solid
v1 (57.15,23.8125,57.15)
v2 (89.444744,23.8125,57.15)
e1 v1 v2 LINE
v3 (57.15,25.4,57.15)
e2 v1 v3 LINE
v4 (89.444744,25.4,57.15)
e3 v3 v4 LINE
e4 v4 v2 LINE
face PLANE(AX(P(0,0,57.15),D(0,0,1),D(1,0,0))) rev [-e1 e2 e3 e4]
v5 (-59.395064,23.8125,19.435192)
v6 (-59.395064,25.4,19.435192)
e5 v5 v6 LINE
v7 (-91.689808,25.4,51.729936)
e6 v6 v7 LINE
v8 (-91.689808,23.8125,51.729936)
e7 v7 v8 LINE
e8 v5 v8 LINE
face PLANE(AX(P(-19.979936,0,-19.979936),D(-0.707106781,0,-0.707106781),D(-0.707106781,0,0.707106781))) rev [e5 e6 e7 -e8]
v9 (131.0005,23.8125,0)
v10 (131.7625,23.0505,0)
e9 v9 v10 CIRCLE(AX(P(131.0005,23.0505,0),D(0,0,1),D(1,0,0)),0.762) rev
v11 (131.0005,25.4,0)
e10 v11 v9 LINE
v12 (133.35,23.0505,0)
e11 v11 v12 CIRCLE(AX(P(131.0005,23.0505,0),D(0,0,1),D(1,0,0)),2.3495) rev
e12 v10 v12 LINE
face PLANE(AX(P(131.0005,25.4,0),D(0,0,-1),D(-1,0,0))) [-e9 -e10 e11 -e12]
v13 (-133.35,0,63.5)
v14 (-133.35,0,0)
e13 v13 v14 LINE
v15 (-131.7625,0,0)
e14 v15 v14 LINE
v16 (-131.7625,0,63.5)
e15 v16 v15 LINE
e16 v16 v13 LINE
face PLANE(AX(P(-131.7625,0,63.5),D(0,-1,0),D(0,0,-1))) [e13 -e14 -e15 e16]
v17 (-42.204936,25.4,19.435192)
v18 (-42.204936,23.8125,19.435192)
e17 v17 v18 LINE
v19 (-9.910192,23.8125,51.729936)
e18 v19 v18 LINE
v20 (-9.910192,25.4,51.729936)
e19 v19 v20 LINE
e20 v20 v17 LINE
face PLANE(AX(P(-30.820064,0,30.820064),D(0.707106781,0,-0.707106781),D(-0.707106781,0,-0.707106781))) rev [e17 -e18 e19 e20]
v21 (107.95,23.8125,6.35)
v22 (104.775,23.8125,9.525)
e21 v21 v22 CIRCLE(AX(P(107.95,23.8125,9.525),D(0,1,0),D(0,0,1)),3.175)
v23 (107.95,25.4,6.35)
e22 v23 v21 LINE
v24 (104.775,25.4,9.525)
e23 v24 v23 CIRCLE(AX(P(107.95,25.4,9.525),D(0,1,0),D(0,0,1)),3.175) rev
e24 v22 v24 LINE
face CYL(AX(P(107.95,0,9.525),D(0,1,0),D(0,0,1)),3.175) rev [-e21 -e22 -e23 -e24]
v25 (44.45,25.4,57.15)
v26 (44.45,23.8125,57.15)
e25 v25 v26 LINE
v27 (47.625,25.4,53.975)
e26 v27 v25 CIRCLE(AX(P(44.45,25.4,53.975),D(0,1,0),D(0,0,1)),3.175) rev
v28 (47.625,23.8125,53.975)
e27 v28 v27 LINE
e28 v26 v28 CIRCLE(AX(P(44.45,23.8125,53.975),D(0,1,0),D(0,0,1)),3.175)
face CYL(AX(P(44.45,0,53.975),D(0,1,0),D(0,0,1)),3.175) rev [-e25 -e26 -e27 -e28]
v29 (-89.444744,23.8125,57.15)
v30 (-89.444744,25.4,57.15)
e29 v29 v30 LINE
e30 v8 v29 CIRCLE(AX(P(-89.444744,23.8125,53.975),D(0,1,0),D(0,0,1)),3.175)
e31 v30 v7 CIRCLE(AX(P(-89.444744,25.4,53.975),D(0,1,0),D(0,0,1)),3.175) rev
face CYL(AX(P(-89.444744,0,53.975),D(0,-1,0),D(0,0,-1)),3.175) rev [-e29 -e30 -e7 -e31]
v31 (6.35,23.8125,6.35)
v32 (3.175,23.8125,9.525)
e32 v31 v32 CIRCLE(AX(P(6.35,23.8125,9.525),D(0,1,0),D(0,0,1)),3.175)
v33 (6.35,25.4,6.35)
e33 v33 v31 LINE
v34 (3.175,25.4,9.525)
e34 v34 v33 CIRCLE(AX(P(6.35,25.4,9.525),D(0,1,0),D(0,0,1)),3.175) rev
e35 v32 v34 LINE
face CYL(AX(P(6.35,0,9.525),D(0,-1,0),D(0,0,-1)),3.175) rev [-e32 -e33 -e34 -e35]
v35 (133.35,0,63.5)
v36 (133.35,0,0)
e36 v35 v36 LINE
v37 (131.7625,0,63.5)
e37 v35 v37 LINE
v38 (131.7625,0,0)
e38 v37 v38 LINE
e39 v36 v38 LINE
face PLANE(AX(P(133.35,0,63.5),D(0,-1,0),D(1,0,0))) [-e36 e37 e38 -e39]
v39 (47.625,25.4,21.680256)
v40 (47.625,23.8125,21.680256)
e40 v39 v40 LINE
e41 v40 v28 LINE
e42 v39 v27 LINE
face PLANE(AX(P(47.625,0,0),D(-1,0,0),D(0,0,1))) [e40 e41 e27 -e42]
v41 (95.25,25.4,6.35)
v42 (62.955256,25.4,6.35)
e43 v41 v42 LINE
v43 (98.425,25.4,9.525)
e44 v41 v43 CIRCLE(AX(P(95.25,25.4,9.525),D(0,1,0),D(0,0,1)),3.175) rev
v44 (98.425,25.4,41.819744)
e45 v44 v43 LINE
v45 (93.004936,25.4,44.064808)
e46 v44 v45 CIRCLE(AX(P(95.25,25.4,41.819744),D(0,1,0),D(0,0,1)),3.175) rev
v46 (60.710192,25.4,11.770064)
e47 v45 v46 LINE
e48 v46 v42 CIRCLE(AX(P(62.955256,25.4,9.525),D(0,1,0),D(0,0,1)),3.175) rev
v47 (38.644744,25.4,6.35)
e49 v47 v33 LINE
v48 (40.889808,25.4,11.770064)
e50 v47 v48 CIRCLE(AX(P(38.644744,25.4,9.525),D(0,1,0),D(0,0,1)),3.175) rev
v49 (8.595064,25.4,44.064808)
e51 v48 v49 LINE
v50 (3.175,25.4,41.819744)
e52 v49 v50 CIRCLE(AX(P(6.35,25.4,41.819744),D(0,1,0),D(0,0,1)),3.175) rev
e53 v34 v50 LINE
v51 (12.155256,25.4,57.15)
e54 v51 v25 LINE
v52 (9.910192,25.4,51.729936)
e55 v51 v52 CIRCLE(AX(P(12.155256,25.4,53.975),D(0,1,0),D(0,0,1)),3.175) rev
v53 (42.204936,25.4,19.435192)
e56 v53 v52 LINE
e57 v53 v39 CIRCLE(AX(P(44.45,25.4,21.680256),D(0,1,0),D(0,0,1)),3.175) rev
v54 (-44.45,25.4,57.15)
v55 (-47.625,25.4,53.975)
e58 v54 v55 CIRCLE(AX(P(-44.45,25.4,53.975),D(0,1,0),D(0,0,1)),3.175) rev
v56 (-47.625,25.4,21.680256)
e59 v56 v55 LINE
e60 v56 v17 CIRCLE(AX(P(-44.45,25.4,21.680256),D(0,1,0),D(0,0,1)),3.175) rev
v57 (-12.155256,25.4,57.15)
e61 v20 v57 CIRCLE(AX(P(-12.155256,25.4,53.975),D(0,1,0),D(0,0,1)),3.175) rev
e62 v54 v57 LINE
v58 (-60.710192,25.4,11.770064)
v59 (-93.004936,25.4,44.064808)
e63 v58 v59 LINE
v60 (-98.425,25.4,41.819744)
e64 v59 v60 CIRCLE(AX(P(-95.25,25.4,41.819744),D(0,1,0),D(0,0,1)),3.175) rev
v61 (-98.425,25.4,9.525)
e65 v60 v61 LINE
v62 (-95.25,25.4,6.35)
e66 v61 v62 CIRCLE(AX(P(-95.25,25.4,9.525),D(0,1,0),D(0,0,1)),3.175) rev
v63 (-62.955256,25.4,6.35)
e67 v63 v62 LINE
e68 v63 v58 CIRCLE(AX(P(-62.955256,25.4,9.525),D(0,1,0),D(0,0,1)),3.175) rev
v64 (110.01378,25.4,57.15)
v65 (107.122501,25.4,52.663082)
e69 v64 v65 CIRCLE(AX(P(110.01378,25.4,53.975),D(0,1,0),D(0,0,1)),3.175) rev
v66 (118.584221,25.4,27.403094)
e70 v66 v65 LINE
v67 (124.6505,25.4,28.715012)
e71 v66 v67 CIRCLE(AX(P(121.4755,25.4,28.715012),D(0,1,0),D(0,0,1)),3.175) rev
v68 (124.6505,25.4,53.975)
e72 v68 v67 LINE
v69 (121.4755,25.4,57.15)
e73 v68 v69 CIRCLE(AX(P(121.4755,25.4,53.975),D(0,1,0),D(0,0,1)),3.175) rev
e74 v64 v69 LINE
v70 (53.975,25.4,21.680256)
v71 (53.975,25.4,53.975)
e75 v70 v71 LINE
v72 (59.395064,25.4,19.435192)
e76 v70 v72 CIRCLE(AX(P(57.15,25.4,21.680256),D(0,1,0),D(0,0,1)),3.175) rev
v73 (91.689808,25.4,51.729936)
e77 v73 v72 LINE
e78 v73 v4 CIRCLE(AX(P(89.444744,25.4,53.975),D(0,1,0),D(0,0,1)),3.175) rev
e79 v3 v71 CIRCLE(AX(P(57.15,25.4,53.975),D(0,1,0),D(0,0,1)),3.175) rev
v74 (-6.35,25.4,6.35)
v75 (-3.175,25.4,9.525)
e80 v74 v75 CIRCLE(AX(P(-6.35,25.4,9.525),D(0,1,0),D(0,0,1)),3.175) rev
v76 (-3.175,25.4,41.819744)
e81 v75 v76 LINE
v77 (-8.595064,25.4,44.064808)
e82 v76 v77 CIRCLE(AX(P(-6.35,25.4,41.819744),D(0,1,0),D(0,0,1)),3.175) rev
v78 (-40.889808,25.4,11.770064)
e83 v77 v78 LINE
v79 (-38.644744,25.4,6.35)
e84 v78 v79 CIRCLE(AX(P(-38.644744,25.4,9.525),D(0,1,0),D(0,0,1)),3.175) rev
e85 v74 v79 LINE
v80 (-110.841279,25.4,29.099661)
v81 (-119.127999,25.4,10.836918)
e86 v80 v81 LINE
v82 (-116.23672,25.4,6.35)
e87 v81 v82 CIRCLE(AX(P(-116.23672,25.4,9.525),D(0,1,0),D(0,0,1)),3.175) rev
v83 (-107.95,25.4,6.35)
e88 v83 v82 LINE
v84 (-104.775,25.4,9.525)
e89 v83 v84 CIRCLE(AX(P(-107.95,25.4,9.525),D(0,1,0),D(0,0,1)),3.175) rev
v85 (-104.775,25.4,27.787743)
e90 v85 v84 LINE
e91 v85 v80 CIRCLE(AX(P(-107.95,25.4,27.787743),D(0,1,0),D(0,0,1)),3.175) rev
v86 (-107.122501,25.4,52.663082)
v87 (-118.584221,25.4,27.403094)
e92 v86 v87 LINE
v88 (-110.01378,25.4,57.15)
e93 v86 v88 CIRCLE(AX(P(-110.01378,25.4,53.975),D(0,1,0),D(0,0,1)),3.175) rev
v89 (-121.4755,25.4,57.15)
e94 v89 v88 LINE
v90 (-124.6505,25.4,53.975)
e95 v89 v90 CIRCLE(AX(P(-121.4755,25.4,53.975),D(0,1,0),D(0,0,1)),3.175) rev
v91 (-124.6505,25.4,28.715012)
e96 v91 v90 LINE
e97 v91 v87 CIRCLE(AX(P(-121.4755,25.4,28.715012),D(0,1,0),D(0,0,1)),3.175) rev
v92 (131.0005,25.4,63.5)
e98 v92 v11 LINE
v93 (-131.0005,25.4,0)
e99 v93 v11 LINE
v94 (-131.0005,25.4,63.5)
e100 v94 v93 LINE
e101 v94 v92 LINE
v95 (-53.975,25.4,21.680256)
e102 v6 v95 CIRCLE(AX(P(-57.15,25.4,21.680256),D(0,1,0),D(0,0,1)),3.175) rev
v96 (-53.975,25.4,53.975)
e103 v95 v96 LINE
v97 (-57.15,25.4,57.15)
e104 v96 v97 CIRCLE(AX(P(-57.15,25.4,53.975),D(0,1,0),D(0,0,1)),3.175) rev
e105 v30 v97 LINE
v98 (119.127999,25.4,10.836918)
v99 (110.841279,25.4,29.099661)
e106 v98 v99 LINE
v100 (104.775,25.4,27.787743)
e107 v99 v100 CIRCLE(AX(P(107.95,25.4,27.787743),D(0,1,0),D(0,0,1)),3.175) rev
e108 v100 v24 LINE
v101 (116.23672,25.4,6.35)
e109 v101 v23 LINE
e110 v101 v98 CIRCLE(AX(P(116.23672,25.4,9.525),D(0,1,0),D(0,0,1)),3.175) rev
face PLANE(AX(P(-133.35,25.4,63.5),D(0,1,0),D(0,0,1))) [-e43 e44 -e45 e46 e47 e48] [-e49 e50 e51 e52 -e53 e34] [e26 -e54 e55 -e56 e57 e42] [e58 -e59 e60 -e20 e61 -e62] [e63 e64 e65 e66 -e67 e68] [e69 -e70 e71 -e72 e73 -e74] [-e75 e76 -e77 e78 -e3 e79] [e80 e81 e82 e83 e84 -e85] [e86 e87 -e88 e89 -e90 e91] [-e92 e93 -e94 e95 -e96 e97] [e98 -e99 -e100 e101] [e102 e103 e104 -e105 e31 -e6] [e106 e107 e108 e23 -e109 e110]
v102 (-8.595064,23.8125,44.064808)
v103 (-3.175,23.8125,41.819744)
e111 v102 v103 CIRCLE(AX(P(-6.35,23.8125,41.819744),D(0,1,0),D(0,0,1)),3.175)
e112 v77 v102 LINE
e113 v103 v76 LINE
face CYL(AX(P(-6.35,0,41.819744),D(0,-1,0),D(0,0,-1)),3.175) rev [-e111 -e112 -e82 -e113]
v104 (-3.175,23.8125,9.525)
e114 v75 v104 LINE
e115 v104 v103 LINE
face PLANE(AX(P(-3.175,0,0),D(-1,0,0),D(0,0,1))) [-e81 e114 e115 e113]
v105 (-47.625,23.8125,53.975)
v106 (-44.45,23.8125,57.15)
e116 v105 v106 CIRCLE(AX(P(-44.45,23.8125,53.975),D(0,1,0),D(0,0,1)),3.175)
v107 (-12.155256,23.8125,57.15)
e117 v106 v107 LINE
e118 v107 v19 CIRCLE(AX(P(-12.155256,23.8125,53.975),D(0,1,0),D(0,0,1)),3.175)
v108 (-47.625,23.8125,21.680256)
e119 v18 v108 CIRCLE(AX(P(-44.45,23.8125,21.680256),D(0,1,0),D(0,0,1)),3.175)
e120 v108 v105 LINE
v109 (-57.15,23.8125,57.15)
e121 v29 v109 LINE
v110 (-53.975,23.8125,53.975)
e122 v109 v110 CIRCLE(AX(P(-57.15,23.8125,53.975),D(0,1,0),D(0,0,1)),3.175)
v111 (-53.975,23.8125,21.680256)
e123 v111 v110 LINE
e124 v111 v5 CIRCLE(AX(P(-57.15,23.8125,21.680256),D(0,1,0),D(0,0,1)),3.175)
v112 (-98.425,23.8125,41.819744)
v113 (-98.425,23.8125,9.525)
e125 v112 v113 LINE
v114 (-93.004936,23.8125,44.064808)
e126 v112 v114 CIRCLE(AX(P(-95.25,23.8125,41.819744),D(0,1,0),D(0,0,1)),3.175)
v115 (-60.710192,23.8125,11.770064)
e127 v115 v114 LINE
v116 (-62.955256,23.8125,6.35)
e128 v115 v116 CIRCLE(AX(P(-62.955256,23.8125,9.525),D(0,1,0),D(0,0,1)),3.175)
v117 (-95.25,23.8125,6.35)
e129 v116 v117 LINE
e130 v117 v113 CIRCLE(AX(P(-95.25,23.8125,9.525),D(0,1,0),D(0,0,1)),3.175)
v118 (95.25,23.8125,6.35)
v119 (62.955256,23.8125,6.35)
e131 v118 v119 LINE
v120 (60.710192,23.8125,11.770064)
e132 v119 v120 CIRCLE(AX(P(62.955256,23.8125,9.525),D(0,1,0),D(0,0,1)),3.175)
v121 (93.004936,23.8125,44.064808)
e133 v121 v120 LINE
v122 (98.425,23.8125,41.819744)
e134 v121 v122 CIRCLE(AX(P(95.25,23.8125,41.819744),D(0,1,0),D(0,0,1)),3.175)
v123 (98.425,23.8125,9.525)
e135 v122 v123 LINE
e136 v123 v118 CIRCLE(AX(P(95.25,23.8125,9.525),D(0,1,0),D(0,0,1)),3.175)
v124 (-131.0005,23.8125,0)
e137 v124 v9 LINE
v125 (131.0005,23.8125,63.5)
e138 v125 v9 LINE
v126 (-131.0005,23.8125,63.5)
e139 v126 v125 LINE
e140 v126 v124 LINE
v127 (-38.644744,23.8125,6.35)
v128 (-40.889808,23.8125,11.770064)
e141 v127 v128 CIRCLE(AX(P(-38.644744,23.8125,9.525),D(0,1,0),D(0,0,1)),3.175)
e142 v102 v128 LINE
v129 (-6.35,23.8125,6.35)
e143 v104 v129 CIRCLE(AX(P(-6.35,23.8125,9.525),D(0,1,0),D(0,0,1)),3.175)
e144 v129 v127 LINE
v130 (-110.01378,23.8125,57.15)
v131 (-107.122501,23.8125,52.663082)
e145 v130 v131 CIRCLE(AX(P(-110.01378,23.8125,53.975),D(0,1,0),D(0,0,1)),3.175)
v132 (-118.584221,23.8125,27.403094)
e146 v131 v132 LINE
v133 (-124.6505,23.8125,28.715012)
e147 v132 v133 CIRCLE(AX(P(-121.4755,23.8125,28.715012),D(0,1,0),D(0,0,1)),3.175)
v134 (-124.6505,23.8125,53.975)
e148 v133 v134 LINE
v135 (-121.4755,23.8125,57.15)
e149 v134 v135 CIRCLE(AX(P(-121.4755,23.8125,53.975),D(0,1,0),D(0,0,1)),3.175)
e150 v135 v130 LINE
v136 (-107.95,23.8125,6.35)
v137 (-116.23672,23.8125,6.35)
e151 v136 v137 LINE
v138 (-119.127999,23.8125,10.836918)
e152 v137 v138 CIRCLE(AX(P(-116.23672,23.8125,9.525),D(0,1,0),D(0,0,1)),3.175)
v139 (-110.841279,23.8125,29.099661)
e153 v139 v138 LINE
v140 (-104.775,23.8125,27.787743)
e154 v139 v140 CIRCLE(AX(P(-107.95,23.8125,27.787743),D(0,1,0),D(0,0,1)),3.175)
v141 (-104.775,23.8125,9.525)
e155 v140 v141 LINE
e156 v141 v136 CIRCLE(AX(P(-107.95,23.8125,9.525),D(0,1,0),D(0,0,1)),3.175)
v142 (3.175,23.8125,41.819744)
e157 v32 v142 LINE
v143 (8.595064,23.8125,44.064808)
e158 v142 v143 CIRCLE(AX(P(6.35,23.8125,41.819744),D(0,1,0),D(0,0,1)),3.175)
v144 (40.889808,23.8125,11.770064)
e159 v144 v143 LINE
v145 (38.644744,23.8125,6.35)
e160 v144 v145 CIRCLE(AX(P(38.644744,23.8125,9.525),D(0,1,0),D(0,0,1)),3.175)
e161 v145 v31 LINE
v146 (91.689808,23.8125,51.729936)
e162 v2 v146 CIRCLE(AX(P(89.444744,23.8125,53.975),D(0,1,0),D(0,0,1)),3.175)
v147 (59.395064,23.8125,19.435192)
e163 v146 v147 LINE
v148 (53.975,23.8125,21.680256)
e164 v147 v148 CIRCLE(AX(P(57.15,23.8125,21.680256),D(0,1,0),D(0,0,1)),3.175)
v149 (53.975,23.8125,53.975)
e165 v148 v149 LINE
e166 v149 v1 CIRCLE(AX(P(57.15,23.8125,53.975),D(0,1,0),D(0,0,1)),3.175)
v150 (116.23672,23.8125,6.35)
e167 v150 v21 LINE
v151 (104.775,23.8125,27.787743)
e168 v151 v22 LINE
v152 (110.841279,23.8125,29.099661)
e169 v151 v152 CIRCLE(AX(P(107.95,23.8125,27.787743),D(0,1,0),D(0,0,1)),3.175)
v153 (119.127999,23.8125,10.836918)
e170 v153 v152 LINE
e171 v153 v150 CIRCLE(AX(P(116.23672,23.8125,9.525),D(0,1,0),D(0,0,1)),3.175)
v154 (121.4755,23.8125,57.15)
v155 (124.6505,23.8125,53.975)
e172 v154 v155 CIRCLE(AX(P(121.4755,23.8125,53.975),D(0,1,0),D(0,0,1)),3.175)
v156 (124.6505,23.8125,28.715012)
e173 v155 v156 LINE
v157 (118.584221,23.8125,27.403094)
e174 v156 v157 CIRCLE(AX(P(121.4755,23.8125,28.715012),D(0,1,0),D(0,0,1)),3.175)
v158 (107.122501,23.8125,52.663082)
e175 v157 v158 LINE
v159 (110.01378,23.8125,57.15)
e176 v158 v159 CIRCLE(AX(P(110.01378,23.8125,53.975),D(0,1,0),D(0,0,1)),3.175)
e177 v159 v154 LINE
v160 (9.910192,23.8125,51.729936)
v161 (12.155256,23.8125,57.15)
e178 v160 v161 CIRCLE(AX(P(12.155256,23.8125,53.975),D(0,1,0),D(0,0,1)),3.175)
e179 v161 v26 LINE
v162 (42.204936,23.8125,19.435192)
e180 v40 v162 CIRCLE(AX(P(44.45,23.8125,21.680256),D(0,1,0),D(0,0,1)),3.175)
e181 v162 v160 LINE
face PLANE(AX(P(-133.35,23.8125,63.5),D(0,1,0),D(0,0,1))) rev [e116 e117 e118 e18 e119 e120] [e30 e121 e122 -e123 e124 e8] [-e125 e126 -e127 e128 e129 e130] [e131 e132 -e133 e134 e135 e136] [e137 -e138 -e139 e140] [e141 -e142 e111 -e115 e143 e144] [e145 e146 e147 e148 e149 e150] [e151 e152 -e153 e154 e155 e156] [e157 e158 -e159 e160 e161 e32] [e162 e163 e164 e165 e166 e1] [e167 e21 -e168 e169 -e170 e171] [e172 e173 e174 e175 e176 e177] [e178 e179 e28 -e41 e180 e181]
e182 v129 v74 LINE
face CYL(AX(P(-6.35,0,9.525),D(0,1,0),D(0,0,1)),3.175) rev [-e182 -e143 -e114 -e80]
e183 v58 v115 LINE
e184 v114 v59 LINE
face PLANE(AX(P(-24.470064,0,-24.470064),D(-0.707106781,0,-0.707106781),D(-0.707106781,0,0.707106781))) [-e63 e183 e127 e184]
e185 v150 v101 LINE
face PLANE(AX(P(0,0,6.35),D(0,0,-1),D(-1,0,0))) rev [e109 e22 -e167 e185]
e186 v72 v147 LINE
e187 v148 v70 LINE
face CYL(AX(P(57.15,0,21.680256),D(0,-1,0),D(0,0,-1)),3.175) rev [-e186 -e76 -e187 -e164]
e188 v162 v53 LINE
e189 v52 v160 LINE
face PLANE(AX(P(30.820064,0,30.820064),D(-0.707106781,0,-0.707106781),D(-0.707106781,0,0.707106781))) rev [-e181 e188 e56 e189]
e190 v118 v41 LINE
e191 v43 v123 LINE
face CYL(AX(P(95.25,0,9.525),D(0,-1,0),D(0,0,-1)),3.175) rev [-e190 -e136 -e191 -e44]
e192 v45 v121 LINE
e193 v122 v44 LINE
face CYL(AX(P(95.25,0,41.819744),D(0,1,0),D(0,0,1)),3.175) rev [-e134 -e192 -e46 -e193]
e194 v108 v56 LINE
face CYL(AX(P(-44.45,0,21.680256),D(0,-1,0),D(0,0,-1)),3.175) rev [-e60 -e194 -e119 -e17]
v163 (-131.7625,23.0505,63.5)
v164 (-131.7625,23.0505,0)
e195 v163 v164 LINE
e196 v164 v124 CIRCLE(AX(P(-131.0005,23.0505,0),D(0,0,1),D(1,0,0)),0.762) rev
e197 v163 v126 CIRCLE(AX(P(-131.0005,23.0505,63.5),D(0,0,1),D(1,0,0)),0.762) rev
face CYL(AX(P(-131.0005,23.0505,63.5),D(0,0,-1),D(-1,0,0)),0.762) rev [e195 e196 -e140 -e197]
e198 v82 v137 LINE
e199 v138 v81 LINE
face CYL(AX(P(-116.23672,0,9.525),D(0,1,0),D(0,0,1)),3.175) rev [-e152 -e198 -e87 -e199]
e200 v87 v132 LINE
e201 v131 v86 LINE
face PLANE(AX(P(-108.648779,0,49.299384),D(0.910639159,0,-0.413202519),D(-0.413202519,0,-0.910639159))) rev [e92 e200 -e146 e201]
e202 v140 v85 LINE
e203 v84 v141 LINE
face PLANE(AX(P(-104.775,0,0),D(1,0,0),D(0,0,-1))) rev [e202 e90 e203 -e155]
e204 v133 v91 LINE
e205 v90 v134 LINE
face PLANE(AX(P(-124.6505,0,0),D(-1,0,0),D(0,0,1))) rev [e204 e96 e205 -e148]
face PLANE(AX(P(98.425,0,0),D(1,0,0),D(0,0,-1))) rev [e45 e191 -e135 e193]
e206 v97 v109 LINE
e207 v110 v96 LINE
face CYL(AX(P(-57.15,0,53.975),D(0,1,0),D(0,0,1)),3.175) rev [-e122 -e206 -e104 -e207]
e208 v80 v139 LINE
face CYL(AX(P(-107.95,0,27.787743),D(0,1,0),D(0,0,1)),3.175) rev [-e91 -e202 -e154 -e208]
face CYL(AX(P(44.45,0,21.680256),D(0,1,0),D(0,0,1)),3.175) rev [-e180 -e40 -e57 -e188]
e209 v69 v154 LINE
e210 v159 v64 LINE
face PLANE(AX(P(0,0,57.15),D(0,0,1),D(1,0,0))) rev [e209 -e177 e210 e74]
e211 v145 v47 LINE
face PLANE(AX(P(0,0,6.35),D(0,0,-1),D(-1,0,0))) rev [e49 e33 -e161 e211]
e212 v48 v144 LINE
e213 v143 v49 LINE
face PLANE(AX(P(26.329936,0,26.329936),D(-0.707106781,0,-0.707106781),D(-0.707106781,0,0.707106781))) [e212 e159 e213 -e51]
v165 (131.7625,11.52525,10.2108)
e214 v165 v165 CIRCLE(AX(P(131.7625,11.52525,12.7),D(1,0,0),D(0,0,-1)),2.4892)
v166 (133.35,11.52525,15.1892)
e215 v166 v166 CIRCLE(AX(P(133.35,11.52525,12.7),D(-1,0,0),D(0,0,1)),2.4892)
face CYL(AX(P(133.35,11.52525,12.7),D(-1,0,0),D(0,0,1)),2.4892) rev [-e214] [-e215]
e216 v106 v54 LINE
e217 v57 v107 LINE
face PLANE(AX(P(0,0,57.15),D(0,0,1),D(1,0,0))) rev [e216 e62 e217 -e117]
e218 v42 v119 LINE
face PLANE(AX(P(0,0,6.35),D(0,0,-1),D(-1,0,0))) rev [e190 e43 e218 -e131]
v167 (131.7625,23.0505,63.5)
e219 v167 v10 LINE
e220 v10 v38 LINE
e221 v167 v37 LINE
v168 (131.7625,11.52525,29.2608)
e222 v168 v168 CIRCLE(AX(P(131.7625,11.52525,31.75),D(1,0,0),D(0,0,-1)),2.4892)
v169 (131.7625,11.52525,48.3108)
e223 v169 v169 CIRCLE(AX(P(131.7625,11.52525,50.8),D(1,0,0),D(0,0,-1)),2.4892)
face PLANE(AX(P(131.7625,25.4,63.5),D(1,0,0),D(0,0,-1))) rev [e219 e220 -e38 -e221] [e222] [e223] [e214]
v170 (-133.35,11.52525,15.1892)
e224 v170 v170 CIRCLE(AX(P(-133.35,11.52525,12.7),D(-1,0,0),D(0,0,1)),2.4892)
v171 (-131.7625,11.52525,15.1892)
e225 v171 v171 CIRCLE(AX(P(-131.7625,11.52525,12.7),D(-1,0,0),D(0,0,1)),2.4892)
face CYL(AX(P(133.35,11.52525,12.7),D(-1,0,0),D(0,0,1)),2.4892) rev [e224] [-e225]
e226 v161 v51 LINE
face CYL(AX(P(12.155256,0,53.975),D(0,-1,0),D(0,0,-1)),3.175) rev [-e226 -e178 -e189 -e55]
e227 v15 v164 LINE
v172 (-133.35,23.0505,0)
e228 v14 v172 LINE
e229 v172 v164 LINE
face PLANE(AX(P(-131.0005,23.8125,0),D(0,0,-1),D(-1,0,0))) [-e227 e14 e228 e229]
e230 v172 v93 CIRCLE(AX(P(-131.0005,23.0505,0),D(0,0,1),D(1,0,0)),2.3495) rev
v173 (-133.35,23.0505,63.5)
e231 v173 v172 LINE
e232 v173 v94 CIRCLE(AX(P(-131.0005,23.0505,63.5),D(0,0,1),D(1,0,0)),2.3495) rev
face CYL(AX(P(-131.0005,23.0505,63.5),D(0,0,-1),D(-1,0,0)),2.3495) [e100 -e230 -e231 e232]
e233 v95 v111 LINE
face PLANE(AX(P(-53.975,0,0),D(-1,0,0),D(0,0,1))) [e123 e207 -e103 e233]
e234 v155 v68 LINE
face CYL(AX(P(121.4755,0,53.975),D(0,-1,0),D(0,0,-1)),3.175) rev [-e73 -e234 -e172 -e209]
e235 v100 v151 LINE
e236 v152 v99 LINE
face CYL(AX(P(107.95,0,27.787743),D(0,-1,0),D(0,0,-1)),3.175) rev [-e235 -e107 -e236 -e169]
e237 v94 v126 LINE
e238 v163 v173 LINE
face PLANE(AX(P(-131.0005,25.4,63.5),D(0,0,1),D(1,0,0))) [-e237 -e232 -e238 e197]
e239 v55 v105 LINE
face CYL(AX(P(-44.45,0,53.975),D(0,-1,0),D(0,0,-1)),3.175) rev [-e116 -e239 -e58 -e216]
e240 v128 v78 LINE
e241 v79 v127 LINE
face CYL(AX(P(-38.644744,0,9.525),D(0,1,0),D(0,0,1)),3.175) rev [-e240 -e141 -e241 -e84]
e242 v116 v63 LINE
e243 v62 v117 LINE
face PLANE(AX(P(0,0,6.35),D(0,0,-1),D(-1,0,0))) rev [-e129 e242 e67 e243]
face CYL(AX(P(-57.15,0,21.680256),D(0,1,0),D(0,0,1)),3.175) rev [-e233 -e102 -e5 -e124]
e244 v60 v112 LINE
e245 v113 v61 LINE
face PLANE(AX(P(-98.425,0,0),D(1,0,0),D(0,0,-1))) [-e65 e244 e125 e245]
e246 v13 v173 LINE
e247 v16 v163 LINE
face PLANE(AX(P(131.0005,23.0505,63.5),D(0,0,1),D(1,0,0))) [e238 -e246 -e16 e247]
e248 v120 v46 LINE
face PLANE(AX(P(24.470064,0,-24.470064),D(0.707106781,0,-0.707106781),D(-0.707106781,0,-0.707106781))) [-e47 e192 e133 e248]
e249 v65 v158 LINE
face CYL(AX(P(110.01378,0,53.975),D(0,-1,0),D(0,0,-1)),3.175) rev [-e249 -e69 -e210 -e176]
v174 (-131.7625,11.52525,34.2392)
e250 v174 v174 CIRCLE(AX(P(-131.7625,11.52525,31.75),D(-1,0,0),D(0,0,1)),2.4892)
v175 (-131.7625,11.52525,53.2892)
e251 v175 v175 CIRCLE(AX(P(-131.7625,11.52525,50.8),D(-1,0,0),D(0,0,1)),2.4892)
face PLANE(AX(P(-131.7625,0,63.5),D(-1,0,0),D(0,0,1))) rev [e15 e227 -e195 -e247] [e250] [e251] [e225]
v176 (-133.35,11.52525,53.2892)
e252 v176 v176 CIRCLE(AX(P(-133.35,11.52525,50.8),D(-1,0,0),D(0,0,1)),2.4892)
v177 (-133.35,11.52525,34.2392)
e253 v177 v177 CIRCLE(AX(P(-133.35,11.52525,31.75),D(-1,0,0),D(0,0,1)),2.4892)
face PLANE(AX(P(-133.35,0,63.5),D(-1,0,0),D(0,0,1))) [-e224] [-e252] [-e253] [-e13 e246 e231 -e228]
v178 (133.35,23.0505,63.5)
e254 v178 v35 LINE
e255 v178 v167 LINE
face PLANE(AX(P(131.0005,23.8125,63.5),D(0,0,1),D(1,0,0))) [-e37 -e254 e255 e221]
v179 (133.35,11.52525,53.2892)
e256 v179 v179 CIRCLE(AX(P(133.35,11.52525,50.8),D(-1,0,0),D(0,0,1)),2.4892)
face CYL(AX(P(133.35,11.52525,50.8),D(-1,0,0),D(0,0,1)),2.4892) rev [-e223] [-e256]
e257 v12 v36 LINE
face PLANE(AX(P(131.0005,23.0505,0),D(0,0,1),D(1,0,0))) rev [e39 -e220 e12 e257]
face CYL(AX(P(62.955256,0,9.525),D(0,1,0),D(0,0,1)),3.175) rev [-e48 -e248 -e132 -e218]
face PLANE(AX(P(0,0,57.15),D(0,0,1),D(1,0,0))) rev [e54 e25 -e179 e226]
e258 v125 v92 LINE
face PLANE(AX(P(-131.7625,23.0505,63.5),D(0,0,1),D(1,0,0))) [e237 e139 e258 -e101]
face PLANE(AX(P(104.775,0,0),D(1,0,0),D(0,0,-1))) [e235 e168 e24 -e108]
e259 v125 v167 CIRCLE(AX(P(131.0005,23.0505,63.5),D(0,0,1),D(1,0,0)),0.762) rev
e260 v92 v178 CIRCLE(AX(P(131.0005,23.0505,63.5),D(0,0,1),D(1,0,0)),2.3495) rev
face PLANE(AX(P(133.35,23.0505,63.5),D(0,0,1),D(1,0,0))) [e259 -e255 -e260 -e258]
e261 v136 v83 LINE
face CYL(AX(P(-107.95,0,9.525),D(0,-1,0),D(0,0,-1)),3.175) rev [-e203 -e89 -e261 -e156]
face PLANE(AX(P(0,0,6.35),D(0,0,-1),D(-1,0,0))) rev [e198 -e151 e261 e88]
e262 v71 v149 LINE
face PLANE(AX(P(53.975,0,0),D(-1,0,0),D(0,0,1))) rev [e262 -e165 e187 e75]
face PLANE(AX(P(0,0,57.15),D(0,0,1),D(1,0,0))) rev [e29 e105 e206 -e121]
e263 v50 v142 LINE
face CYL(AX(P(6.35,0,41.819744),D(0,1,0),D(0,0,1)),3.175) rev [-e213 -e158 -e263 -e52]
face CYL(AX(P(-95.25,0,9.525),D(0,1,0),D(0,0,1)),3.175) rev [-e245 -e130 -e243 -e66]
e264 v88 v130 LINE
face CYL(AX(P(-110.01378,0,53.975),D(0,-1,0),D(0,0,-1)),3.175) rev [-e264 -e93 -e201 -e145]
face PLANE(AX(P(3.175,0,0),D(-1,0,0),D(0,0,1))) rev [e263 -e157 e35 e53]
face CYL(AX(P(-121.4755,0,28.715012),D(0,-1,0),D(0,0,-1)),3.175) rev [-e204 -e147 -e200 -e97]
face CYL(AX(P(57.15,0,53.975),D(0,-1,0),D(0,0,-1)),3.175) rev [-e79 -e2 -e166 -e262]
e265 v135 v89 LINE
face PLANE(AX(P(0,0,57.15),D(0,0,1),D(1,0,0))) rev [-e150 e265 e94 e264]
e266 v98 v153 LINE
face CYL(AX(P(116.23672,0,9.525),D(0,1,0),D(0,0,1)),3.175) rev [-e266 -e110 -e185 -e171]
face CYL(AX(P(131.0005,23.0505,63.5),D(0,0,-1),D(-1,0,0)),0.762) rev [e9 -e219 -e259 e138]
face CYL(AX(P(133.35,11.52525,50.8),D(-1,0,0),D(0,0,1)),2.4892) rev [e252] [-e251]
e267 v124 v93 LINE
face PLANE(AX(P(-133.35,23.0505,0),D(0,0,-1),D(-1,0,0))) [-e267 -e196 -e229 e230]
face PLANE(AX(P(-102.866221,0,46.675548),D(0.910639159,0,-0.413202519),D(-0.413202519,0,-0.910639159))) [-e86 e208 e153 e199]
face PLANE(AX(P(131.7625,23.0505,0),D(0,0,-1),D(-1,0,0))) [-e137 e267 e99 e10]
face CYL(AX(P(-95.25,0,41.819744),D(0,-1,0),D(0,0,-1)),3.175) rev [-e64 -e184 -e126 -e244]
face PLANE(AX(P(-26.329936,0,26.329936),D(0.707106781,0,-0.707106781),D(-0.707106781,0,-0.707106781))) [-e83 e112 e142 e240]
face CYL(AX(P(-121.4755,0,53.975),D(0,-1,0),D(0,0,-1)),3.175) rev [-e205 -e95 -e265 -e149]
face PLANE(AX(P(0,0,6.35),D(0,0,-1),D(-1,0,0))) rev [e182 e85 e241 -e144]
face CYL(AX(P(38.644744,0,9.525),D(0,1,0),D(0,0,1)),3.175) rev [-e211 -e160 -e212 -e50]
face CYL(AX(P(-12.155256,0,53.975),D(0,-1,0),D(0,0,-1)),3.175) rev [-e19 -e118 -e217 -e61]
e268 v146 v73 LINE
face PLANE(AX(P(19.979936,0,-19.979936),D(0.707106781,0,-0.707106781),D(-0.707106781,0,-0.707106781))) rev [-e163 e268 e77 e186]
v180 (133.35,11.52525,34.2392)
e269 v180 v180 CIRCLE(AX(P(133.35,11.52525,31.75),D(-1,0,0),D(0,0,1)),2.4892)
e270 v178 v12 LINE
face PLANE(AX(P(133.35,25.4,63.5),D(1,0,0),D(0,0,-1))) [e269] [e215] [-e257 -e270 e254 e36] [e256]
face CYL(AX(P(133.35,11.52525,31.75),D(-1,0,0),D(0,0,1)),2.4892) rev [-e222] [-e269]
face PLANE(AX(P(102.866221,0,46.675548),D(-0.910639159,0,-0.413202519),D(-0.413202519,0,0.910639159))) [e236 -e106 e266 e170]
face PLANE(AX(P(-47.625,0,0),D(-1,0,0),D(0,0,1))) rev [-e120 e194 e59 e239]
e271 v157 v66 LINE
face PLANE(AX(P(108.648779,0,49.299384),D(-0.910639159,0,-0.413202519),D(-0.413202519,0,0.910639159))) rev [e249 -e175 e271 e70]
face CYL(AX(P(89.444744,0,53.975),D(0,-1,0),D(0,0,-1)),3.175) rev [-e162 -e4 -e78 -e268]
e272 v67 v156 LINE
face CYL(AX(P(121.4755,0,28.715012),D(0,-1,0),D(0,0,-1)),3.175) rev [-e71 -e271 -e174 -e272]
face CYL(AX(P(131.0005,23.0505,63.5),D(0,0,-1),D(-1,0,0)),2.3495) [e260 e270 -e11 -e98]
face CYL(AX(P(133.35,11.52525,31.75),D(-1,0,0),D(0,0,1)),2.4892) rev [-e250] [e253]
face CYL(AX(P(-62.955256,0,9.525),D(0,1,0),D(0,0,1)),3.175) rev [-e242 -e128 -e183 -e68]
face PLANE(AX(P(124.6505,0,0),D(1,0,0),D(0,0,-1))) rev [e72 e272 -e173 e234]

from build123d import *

# Parameters (mm, degrees)
BASE_FLANGE1_DEPTH      = 63.5
CUT_EXTRUDE1_DEPTH      = 276.329439036
CUT_EXTRUDE1_DEPTH_BACK = 276.329439036
SKETCH6_R               = 2.4892
CUT_EXTRUDE2_DEPTH      = 150.865381259
FILLET1_R               = 3.175


# Sheet-metal steps are written as plain solids
with BuildPart() as part:
    # Sketch1 → Base-Flange1 (new body)
    with BuildSketch(Plane.XY):
        with BuildLine():
            Line((-133.35, 0), (-133.35, 23.0505))
            ThreePointArc((-133.35, 23.0505), (-132.661847382, 24.711847382), (-131.0005, 25.4))
            Line((-131.0005, 25.4), (131.0005, 25.4))
            ThreePointArc((131.0005, 25.4), (132.661847382, 24.711847382), (133.35, 23.0505))
            Line((133.35, 23.0505), (133.35, 0))
            Line((133.35, 0), (131.7625, 0))
            Line((131.7625, 0), (131.7625, 23.0505))
            ThreePointArc((131.7625, 23.0505), (131.539315367, 23.589315367), (131.0005, 23.8125))
            Line((131.0005, 23.8125), (-131.0005, 23.8125))
            ThreePointArc((-131.0005, 23.8125), (-131.539315367, 23.589315367), (-131.7625, 23.0505))
            Line((-131.7625, 23.0505), (-131.7625, 0))
            Line((-131.7625, 0), (-133.35, 0))
        make_face()
    extrude(amount=BASE_FLANGE1_DEPTH)

    # Sketch6 → Cut-Extrude1 (cut, two sides: drawn at the far end of the back side and taken through both)
    with BuildSketch(Plane.ZY.offset(133.35).offset(-CUT_EXTRUDE1_DEPTH_BACK)):
        with Locations((12.7, 11.52525)):
            Circle(SKETCH6_R)
        with Locations((50.8, 11.52525)):
            Circle(SKETCH6_R)
        with Locations((31.75, 11.52525)):
            Circle(SKETCH6_R)
    extrude(amount=CUT_EXTRUDE1_DEPTH + CUT_EXTRUDE1_DEPTH_BACK, mode=Mode.SUBTRACT)

    # Sketch7 → Cut-Extrude2 (cut, through all)
    with BuildSketch(Plane(origin=(0, 25.4, 0), x_dir=(1, 0, 0), z_dir=(0, 1, 0))):
        Polygon((-104.775, -42.468871356), (-104.775, -6.35), (-121.163937878, -6.35), align=None)
        Polygon((-124.6505, -57.15), (-105.086562122, -57.15), (-124.6505, -14.033883464), align=None)
        Polygon((-98.425, -49.484871939), (-55.290128061, -6.35), (-98.425, -6.35), align=None)
        Polygon((-97.109871939, -57.15), (-53.975, -57.15), (-53.975, -14.015128061), align=None)
        Polygon((-47.625, -57.15), (-4.490128061, -57.15), (-47.625, -14.015128061), align=None)
        Polygon((-3.175, -49.484871939), (-3.175, -6.35), (-46.309871939, -6.35), align=None)
        Polygon((3.175, -49.484871939), (46.309871939, -6.35), (3.175, -6.35), align=None)
        Polygon((4.490128061, -57.15), (47.625, -57.15), (47.625, -14.015128061), align=None)
        Polygon((105.086562122, -57.15), (124.6505, -57.15), (124.6505, -14.033883464), align=None)
        Polygon((104.775, -42.468871356), (121.163937878, -6.35), (104.775, -6.35), align=None)
        Polygon((55.290128061, -6.35), (98.425, -49.484871939), (98.425, -6.35), align=None)
        Polygon((53.975, -57.15), (97.109871939, -57.15), (53.975, -14.015128061), align=None)
    extrude(amount=-CUT_EXTRUDE2_DEPTH, mode=Mode.SUBTRACT)

    # Fillet1
    fillet1_edges = [part.edges().sort_by_distance(p)[0] for p in [
        (-3.175, 24.60625, 6.35),
        (-3.175, 24.60625, 49.484871939),
        (-46.309871939, 24.60625, 6.35),
        (3.175, 24.60625, 6.35),
        (46.309871939, 24.60625, 6.35),
        (3.175, 24.60625, 49.484871939),
        (47.625, 24.60625, 14.015128061),
        (47.625, 24.60625, 57.15),
        (4.490128061, 24.60625, 57.15),
        (124.6505, 24.60625, 14.033883464),
        (124.6505, 24.60625, 57.15),
        (105.086562122, 24.60625, 57.15),
        (-105.086562122, 24.60625, 57.15),
        (-124.6505, 24.60625, 57.15),
        (-124.6505, 24.60625, 14.033883464),
        (-55.290128061, 24.60625, 6.35),
        (-98.425, 24.60625, 49.484871939),
        (-98.425, 24.60625, 6.35),
        (-53.975, 24.60625, 14.015128061),
        (-53.975, 24.60625, 57.15),
        (-97.109871939, 24.60625, 57.15),
        (-4.490128061, 24.60625, 57.15),
        (-47.625, 24.60625, 57.15),
        (-47.625, 24.60625, 14.015128061),
        (53.975, 24.60625, 14.015128061),
        (97.109871939, 24.60625, 57.15),
        (53.975, 24.60625, 57.15),
        (98.425, 24.60625, 49.484871939),
        (55.290128061, 24.60625, 6.35),
        (98.425, 24.60625, 6.35),
        (121.163937878, 24.60625, 6.35),
        (104.775, 24.60625, 42.468871356),
        (104.775, 24.60625, 6.35),
        (-104.775, 24.60625, 42.468871356),
        (-121.163937878, 24.60625, 6.35),
        (-104.775, 24.60625, 6.35),
    ]]
    fillet(fillet1_edges, radius=FILLET1_R)


solid = part.part
